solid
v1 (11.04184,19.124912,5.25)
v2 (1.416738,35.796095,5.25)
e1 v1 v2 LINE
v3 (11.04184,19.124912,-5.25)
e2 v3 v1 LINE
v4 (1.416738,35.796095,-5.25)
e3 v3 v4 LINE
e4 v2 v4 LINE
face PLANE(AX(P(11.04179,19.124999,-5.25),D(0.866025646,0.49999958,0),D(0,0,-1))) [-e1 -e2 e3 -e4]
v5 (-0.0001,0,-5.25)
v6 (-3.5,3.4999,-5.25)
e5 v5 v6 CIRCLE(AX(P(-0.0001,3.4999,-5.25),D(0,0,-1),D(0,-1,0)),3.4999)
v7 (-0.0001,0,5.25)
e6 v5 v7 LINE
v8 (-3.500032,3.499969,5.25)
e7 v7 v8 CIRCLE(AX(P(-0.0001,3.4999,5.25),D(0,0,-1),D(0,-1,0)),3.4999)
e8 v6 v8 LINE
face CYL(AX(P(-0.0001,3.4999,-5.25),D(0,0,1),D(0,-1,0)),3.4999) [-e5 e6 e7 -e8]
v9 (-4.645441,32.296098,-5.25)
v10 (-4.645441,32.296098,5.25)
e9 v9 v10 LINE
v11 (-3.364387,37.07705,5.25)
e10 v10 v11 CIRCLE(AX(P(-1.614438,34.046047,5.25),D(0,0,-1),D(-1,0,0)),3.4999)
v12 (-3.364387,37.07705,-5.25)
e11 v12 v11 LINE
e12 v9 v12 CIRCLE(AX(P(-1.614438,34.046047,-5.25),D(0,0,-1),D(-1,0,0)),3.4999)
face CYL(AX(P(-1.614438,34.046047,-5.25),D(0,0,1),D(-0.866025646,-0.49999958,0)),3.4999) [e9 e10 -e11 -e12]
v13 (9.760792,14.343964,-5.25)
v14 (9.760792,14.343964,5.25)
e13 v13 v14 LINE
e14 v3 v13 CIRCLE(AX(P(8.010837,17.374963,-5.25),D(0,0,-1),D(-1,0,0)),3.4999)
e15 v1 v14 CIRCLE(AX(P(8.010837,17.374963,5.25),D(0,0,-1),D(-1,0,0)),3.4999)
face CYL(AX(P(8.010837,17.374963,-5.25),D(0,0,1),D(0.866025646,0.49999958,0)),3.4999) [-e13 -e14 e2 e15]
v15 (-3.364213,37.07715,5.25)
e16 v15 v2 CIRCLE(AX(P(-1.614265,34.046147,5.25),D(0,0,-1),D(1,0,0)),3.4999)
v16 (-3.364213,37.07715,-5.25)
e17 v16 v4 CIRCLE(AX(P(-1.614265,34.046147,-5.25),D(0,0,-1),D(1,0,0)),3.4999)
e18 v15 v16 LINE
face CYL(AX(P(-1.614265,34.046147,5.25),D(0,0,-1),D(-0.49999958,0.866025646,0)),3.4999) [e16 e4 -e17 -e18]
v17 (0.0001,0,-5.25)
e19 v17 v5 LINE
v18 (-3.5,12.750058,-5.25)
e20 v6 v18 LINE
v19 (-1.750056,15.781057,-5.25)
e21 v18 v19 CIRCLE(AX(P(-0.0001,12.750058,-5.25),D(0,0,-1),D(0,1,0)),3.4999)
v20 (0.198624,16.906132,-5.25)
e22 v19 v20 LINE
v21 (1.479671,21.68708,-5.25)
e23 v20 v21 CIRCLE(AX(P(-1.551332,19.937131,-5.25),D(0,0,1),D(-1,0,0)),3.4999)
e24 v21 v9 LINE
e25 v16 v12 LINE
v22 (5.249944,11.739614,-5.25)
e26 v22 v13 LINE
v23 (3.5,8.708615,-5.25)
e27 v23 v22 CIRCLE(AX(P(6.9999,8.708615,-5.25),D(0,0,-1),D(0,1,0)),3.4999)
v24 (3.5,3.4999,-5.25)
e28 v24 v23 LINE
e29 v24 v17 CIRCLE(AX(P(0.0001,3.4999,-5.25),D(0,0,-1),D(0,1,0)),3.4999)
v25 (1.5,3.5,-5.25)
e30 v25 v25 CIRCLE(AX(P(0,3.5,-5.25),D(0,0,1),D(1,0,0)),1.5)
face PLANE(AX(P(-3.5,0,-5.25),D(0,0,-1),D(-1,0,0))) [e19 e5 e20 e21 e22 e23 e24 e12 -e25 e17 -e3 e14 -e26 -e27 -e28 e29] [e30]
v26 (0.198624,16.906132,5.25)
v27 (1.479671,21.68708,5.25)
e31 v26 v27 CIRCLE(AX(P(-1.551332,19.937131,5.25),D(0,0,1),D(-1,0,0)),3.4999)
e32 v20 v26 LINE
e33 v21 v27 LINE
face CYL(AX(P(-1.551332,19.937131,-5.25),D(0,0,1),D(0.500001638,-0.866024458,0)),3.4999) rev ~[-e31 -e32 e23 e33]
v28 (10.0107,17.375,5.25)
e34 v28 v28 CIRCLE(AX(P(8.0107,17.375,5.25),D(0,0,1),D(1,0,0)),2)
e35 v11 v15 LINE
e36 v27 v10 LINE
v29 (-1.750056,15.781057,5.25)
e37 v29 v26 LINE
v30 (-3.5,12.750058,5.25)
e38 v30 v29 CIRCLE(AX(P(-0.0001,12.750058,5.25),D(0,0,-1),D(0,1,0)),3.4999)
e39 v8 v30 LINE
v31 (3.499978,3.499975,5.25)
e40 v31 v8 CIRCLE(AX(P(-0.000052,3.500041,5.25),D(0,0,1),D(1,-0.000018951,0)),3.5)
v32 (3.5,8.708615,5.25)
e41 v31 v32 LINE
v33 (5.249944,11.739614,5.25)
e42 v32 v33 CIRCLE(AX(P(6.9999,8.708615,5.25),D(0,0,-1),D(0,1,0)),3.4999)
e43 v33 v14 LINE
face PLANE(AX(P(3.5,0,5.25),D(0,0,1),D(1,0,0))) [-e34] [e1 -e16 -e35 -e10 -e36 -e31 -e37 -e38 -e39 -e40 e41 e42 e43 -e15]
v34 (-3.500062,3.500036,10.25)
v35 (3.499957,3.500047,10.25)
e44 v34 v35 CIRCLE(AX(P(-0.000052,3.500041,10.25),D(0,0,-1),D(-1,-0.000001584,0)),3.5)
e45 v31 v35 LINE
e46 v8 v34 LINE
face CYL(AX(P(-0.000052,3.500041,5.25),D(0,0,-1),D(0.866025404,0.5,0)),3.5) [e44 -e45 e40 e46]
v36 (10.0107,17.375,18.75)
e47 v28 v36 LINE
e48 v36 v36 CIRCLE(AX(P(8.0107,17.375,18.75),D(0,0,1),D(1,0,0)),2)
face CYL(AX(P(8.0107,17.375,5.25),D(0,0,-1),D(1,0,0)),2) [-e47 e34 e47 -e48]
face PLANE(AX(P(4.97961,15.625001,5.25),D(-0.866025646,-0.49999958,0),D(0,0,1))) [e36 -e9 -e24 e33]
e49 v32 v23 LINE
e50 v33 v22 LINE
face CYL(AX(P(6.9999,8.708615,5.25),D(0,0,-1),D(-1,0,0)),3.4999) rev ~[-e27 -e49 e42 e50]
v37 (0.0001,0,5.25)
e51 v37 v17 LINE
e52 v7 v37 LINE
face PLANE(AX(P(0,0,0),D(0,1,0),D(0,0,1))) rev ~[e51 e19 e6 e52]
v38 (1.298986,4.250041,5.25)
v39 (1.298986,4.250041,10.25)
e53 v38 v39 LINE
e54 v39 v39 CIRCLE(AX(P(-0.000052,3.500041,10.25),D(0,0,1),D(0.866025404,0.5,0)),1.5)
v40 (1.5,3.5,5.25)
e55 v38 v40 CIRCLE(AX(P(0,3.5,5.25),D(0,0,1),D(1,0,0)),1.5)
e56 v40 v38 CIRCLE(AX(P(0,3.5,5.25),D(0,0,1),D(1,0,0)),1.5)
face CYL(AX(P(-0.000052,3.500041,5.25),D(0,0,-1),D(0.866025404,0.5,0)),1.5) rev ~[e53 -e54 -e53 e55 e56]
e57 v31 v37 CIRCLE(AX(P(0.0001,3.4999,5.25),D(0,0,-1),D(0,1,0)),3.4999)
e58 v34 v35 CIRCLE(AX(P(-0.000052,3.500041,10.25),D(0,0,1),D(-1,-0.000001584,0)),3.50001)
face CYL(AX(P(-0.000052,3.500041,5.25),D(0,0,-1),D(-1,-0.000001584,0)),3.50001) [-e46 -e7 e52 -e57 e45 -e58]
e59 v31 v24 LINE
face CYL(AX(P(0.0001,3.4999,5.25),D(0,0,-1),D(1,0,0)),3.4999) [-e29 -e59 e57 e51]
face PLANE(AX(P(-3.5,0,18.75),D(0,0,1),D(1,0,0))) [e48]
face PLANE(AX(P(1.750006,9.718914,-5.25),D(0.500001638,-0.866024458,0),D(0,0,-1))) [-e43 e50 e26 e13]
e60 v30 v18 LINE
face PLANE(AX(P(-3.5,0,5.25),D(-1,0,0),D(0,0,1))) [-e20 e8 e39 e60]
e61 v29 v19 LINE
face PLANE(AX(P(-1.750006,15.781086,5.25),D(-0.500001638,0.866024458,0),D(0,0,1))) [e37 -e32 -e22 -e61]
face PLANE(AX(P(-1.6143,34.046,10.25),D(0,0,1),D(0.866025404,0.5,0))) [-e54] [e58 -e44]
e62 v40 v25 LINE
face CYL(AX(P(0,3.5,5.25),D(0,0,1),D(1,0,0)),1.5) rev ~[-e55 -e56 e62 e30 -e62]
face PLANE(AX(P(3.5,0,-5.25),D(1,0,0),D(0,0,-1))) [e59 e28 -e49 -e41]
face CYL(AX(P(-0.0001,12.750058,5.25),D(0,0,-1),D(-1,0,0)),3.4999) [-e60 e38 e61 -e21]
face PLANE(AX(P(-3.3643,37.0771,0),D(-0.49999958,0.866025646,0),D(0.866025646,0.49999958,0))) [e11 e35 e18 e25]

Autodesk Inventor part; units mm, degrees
ref_plane "YZ Plane" through (0, 0, 0) normal (1, 0, 0) x (0, 1, 0)
ref_plane "XZ Plane" through (0, 0, 0) normal (0, 1, 0) x (-1, 0, 0)
ref_plane "XY Plane" through (0, 0, 0) normal (0, 0, 1) x (1, 0, 0)
sketch "Sketch2" plane through (0, 0, 0) normal (0, 1, 0) x (-1, 0, 0)
  line L0 (3.5, -5.25) -> (-3.5, -5.25)
  line L1 (-3.5, -5.25) -> (-3.5, 5.25)
  line L2 (-3.5, 5.25) -> (3.5, 5.25)
  line L3 (3.5, 5.25) -> (3.5, -5.25)
  line L4 (3.5, -5.25) -> (-3.5, 5.25) construction
  line L5 (-3.5, -5.25) -> (3.5, 5.25) construction
  point P0 (0, 0)
  dimension "d11" = 10.5
  dimension "d12" = 7
sketch "Sketch3" plane through (0, 0, 0) normal (0, 0, 1) x (1, 0, 0)
  line L0 (0, 0) -> (0, 12.75)
  line L1 (0, 12.75) -> (8.0107, 17.375)
  line L2 (8.0107, 17.375) -> (-3.3643, 37.0771)
  dimension "d13" = 12.75
  dimension "d14" = 9.25
  dimension "d15" = 120
  dimension "d16" = 22.75
  dimension "d30" = 90
sweep "Sweep1" add profiles "Sketch2" path "Sketch3"
sketch "Sketch4" plane through (-3.5, 0, 5.25) normal (0, 0, 1) x (1, 0, 0)
  line L0 (7, 0) -> (0, 0) projected
  circle A0 centre (3.5, 3.5) radius 1.5
  point P0 (3.5, 0)
  point P1 (3.5, 0)
  dimension "d19" = 3
  dimension "d20" = 3.5
extrude "Extrusion1" cut sketch "Sketch4" against normal blind 11.5
sketch "Sketch5" plane through (-3.5, 0, 5.25) normal (0, 0, 1) x (1, 0, 0)
  line L0 (6.7296, 18.6561) -> (16.2918, 16.0939) construction
  circle A0 centre (11.5107, 17.375) radius 2
  point P0 (3.5, 0)
  dimension "d24" = 4
extrude "Extrusion2" add sketch "Sketch5" along normal blind 13.5
fillet "Fillet2" radius 3.5 8 edges at (3.5, 0, 0) (-3.5, 0, 0) (3.5, 10.7293, 0) (-0.3332, 38.8271, 0) (12.7918, 16.0939, 0) (-3.5, 14.7707, 0) (3.2296, 18.6561, 0) (-6.3954, 35.3271, 0)
sketch "Sketch6" plane through (-1.6143, 34.046, 5.25) normal (0, 0, 1) x (0.8660254, 0.5, 0)
  circle A0 centre (-13.875, -27.2607) radius 1.5 projected
  arc A1 (-16.9061, -25.5107) -> (-10.8439, -29.0107) centre (-13.875, -27.2607) ccw projected
  circle A2 centre (-13.875, -27.2607) radius 3.5
  point P0 (-15.625, -30.2918)
extrude "Extrusion3" add sketch "Sketch6" along normal blind 5
properties part number "arm"
